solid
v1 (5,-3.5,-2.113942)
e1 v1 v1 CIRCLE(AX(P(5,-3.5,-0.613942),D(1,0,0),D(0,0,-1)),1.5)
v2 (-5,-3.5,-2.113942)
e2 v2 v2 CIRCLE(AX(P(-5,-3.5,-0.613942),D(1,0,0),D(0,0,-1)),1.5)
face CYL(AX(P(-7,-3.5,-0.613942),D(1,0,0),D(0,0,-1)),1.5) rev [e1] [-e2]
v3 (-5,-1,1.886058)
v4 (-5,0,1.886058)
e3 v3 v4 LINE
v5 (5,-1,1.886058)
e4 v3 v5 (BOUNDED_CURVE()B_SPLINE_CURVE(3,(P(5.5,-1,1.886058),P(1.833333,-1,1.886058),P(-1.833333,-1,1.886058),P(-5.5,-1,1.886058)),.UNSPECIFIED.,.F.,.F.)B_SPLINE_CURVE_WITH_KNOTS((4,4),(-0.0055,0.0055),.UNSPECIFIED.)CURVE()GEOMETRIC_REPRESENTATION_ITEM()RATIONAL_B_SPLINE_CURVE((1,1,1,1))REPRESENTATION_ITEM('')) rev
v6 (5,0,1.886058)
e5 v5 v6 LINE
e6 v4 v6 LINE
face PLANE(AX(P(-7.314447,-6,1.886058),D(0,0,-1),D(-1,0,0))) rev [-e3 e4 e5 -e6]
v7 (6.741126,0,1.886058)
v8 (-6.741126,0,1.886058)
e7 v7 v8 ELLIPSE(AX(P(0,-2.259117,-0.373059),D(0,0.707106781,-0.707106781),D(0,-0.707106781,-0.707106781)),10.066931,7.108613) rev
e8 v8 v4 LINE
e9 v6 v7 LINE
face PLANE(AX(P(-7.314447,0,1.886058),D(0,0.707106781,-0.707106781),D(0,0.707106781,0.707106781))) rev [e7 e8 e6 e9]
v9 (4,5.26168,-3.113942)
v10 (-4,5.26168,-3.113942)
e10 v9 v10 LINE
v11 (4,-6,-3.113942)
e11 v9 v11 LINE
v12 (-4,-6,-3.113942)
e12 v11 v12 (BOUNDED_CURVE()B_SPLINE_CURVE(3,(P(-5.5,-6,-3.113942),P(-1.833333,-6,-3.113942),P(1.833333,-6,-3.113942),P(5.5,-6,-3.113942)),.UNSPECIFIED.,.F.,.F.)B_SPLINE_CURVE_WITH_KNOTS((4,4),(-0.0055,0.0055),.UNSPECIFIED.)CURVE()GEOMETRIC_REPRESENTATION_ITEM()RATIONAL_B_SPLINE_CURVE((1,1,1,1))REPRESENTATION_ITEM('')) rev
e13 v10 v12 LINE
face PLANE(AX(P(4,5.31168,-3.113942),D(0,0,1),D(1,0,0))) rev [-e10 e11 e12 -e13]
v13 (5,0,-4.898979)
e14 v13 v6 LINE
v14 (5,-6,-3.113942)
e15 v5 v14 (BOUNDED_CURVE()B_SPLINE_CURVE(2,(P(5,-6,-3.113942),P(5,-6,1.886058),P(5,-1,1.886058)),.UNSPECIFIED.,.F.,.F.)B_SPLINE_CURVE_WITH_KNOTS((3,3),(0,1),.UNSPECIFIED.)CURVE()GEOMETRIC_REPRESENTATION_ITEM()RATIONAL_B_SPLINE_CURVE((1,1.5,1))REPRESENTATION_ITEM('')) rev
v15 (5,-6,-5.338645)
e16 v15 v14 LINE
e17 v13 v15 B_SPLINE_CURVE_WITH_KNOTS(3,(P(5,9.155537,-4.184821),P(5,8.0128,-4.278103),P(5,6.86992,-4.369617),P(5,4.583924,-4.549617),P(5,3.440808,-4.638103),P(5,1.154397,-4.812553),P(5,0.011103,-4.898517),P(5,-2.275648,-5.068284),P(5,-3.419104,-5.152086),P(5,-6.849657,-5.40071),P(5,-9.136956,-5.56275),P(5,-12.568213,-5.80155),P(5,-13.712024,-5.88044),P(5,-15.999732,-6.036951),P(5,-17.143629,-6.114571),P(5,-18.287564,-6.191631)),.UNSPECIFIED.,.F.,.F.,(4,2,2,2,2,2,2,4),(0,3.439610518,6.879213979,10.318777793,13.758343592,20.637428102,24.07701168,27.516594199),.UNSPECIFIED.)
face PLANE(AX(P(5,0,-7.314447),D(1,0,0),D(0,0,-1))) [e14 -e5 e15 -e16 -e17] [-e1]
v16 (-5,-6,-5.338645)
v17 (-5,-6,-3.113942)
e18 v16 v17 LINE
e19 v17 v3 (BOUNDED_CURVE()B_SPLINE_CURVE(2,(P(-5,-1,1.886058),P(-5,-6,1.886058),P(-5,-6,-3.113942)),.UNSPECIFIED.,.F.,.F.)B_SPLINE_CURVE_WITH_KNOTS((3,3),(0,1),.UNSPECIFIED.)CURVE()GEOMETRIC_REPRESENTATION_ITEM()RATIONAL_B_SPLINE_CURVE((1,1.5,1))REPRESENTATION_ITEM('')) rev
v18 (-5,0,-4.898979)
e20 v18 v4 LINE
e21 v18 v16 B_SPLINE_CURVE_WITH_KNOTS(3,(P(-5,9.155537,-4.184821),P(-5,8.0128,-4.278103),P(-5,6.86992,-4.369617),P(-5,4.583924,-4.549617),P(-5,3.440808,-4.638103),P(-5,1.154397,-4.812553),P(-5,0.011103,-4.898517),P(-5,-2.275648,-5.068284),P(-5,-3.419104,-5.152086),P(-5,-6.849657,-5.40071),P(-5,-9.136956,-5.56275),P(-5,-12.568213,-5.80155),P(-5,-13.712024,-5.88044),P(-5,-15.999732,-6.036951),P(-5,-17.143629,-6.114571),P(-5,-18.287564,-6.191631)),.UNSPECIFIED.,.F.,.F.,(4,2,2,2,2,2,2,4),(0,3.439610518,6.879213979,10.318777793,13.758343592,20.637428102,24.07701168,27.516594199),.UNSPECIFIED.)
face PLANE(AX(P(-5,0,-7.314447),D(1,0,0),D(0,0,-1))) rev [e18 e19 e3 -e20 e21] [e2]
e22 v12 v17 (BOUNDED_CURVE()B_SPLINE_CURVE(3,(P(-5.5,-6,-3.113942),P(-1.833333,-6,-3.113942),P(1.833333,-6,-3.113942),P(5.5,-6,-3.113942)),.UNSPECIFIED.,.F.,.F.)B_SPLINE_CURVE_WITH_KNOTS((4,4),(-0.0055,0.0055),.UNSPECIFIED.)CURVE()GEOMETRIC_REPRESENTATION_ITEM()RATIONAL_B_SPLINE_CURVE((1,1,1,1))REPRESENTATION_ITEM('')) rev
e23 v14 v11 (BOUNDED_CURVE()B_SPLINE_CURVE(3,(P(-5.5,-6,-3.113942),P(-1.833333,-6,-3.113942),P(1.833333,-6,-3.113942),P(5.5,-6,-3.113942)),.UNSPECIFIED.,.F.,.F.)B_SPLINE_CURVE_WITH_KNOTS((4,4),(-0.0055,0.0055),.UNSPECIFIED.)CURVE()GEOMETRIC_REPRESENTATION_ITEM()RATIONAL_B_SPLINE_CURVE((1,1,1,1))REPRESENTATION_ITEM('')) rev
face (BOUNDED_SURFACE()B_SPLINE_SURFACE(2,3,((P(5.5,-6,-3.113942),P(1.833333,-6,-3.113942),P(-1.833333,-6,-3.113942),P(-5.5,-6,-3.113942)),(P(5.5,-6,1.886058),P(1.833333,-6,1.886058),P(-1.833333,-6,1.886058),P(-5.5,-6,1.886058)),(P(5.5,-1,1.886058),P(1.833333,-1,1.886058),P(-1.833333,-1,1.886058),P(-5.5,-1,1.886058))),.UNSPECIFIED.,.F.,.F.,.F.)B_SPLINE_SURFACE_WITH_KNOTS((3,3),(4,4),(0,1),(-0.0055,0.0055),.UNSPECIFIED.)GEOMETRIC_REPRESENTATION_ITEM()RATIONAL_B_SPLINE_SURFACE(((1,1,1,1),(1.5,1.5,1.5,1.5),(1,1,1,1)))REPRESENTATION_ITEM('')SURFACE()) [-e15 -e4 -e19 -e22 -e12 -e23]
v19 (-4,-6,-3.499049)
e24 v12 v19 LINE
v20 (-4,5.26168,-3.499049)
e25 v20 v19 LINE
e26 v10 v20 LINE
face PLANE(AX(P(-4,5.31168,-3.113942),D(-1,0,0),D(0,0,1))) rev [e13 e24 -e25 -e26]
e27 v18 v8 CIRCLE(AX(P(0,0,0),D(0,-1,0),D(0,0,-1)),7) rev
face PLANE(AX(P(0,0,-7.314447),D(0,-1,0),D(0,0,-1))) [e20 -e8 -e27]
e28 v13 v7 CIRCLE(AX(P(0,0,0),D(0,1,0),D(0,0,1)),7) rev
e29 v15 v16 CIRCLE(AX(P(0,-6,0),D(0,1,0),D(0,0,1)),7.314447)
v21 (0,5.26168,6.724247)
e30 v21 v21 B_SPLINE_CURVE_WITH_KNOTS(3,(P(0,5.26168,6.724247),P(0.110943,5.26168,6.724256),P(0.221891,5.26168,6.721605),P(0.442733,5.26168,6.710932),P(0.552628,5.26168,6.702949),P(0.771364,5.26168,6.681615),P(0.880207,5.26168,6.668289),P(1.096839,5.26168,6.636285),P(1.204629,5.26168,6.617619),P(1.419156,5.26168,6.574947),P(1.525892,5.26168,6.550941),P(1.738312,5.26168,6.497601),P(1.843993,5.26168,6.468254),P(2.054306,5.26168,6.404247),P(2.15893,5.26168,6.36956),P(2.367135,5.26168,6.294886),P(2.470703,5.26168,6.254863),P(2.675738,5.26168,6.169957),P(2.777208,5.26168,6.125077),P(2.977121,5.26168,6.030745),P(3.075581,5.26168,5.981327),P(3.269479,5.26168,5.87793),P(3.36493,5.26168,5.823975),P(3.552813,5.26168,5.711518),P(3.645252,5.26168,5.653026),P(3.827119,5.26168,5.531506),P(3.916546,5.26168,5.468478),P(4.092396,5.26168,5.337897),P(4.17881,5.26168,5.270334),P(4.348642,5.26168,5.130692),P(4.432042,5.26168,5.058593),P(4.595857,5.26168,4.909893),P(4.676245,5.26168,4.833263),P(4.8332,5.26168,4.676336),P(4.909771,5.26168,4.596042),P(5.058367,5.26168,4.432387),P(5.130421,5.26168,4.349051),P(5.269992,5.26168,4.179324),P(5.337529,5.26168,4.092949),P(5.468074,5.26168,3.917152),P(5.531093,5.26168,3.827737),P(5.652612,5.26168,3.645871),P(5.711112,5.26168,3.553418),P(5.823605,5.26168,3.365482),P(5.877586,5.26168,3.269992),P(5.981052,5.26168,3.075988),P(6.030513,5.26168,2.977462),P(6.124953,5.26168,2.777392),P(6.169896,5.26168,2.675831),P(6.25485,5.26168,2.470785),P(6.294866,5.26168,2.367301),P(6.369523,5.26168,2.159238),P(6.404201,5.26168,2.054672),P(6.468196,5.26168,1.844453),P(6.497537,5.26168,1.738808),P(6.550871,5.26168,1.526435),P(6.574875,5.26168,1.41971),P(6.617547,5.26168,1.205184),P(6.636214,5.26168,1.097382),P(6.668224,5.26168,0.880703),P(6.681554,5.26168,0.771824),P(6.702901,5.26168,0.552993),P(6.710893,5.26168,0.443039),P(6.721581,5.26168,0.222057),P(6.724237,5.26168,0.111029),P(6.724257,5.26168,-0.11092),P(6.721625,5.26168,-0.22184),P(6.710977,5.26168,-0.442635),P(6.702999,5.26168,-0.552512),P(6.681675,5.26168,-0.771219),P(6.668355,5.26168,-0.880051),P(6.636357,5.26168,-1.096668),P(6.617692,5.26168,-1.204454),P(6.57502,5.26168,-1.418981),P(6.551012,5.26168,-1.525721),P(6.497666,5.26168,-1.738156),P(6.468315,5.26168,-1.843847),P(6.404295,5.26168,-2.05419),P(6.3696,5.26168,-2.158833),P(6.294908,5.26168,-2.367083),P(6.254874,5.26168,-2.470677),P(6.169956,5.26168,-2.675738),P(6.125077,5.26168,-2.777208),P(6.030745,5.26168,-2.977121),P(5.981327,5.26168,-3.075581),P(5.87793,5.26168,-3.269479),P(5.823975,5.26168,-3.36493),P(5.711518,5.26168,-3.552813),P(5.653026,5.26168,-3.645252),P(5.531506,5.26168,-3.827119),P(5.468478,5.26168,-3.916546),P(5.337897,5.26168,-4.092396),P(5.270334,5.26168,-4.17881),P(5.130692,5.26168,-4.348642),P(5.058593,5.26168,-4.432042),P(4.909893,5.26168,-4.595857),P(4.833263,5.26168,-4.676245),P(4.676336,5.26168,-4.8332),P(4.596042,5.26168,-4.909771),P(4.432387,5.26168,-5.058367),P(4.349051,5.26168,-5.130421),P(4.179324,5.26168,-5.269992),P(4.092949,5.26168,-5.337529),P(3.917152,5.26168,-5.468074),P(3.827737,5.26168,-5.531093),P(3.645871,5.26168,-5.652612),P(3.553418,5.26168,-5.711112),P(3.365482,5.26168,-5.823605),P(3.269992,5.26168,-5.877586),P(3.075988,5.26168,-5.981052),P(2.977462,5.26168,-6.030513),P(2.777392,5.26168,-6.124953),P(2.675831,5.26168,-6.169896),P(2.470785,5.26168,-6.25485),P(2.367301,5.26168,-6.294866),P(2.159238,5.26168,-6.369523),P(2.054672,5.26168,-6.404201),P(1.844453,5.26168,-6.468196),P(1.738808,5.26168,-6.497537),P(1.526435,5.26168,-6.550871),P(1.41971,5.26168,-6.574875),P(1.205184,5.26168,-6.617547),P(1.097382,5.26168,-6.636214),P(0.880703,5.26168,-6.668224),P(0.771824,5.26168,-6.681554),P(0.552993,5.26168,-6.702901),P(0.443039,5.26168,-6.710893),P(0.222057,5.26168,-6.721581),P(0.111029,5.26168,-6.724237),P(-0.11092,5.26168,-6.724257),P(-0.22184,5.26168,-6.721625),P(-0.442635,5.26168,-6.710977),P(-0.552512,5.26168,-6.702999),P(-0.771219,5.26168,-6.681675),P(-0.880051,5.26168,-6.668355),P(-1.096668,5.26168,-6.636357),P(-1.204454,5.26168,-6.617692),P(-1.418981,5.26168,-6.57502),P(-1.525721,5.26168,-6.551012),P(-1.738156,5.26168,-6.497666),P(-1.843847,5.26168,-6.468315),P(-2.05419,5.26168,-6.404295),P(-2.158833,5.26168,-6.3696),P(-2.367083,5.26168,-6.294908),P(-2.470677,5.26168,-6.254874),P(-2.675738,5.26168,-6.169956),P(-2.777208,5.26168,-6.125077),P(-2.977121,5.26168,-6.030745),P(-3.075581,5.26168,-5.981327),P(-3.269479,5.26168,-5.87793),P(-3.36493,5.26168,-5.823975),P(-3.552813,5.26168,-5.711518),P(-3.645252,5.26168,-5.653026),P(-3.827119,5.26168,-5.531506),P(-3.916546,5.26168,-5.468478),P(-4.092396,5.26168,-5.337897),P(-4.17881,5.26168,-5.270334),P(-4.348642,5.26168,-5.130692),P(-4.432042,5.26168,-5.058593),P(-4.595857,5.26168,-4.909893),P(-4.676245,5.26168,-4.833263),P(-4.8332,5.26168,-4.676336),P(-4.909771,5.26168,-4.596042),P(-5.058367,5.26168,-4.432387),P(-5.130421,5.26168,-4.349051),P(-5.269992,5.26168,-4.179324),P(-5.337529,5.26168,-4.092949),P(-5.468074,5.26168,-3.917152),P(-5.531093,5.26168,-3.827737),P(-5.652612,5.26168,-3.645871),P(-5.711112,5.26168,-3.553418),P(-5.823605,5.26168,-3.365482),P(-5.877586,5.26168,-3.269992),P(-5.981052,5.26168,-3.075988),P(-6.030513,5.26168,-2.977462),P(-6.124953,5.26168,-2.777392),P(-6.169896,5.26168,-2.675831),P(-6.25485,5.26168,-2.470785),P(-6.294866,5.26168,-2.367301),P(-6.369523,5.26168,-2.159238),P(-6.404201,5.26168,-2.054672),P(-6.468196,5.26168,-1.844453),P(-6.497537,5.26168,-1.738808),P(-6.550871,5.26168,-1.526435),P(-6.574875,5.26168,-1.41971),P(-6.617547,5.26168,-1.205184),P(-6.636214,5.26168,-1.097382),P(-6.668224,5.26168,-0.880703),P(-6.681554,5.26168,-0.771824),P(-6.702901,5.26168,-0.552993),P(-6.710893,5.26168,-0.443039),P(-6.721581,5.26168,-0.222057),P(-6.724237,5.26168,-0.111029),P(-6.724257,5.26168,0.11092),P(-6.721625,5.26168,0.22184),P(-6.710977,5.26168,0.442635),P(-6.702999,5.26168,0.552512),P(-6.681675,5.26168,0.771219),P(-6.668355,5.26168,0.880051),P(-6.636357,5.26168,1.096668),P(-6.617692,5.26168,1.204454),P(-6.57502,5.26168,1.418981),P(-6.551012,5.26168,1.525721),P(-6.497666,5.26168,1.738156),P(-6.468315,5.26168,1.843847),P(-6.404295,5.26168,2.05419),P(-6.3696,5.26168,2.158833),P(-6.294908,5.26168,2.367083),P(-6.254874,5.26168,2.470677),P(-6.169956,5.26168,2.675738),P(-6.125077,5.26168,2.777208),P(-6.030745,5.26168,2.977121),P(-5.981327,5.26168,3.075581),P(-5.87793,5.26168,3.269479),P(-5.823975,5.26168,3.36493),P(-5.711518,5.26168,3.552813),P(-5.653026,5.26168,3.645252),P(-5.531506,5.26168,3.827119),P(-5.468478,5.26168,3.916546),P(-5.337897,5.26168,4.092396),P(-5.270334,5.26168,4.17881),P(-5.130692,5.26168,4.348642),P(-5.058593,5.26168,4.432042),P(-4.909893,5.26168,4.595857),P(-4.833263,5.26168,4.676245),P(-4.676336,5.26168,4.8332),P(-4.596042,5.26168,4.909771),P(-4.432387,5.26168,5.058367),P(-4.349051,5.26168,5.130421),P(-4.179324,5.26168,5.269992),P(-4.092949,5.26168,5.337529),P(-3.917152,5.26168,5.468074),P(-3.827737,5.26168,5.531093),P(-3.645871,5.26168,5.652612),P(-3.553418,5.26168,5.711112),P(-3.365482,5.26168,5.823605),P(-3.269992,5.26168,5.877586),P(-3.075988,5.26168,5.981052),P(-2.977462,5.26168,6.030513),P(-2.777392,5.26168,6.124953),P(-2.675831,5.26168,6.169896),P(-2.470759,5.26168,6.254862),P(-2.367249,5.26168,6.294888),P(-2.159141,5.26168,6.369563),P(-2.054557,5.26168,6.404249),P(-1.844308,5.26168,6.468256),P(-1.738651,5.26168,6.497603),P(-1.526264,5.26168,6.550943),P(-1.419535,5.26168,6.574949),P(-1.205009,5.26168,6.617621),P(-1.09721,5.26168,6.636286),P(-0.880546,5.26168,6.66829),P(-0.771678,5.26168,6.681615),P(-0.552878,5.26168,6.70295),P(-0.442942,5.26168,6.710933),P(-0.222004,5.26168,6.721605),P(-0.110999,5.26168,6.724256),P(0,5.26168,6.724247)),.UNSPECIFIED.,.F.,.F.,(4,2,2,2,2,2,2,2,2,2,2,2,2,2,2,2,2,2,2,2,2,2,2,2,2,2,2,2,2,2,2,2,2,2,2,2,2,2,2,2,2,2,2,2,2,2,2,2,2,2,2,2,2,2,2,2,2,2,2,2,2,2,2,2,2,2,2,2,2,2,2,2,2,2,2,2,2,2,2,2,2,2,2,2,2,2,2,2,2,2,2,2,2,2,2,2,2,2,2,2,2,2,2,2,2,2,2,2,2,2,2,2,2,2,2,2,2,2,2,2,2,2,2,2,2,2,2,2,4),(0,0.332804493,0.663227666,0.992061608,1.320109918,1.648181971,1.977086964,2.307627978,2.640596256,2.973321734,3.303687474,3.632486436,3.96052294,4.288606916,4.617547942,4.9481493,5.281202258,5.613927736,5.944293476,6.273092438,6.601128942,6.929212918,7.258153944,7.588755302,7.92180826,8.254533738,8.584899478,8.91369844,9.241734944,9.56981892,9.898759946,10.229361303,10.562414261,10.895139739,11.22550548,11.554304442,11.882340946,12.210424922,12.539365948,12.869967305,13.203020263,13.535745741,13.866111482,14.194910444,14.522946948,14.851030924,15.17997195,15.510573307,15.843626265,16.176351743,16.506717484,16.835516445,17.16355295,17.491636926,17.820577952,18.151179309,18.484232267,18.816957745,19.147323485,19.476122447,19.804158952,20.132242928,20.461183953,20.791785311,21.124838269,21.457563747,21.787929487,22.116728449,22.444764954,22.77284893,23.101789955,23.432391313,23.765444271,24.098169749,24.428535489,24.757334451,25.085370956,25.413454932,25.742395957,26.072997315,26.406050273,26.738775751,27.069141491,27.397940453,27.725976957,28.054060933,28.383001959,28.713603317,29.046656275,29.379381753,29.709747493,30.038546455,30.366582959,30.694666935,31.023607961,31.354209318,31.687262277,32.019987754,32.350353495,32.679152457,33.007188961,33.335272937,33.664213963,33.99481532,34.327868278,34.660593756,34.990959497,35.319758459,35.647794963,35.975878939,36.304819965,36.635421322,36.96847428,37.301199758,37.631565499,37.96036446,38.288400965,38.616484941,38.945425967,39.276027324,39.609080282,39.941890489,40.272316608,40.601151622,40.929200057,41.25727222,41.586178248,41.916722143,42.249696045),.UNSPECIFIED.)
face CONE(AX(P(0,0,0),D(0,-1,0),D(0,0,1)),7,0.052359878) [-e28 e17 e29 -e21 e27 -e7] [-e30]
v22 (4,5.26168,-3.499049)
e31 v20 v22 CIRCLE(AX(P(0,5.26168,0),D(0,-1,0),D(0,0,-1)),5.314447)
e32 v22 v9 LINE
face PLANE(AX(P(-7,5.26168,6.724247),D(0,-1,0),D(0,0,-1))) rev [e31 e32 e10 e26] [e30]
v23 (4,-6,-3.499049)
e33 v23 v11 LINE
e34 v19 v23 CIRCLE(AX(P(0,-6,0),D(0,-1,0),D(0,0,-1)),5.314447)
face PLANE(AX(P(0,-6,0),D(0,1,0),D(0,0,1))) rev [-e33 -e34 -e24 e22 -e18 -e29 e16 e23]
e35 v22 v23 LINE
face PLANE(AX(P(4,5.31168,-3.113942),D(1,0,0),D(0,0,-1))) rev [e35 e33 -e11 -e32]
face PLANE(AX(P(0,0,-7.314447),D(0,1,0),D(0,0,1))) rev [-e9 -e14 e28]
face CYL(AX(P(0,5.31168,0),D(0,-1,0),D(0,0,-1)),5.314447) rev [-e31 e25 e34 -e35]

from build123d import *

# Parameters (mm, degrees)
SKETCH1_R                     = 7
BOSS_EXTRUDE1_DEPTH           = 15
BOSS_EXTRUDE1_TAPER           = 3
BOSS_EXTRUDE1_OTHER_WAY_DEPTH = 6
BOSS_EXTRUDE1_OTHER_WAY_TAPER = -3
CUT_EXTRUDE1_DEPTH            = 19.220929184
CUT_EXTRUDE1_DEPTH_BACK       = 19.220929184
CUT_EXTRUDE2_START            = -9.200504543
CUT_EXTRUDE2_OUTLINE_W        = 6.502745185
CUT_EXTRUDE2_OUTLINE_H        = 6
CUT_EXTRUDE2_DEPTH            = 9.200504543
SKETCH5_R                     = 1.5
CUT_EXTRUDE3_DEPTH            = 21.554832283
FILLET1_SIZE                  = 5
CUT_EXTRUDE4_DEPTH            = 19.096992379
CUT_EXTRUDE4_DEPTH_BACK       = 19.096992379
SKETCH6_W                     = 14.909790155
SKETCH6_H                     = 10.479187812
CUT_EXTRUDE5_DEPTH            = 16.143532008


with BuildPart() as part:
    # Sketch1 → Boss-Extrude1 (new body)
    with BuildSketch(Plane(origin=(0, 0, 0), x_dir=(1, 0, 0), z_dir=(0, 1, 0))):
        Circle(SKETCH1_R)
    extrude(amount=BOSS_EXTRUDE1_DEPTH, taper=BOSS_EXTRUDE1_TAPER)

    # Sketch1 → Boss-Extrude1 other way (add)
    with BuildSketch(Plane(origin=(0, 0, 0), x_dir=(1, 0, 0), z_dir=(0, 1, 0))):
        Circle(SKETCH1_R)
    extrude(amount=-BOSS_EXTRUDE1_OTHER_WAY_DEPTH, taper=BOSS_EXTRUDE1_OTHER_WAY_TAPER)

    # Sketch3 → Cut-Extrude1 (cut, two sides: drawn at the far end of the back side and taken through both)
    with BuildSketch(Plane(origin=(0, 0, 0), x_dir=(0, 0, -1), z_dir=(1, 0, 0)).offset(-CUT_EXTRUDE1_DEPTH_BACK)):
        Polygon((-1.886057768, -6), (-1.886057768, 0), (-9.929766736, 8.043708969), (-9.929766736, -6), align=None)
    extrude(amount=CUT_EXTRUDE1_DEPTH + CUT_EXTRUDE1_DEPTH_BACK, mode=Mode.SUBTRACT)

    # Cut-Extrude2: read off the stored shape, not the designer's step
    # Cut-Extrude2 outline → Cut-Extrude2 (cut)
    with BuildSketch(Plane.XY.offset(1.886057768).offset(CUT_EXTRUDE2_START)):
        with Locations((-8.251372593, -3)):
            Rectangle(CUT_EXTRUDE2_OUTLINE_W, CUT_EXTRUDE2_OUTLINE_H)
        with Locations((8.251372593, -3)):
            Rectangle(CUT_EXTRUDE2_OUTLINE_W, CUT_EXTRUDE2_OUTLINE_H)
    extrude(amount=CUT_EXTRUDE2_DEPTH, mode=Mode.SUBTRACT)

    # Sketch5 → Cut-Extrude3 (cut, through all)
    with BuildSketch(Plane(origin=(5, 0, 0), x_dir=(0, 0, -1), z_dir=(1, 0, 0))):
        with Locations((0.613942232, -3.5)):
            Circle(SKETCH5_R)
    extrude(amount=-CUT_EXTRUDE3_DEPTH, mode=Mode.SUBTRACT)

    # Fillet1
    # a fillet whose section is not a circle: 5 mm, written as the material it takes off along each edge
    with BuildSketch(Plane(origin=(17.5, -6, 1.886057768), x_dir=(0, 0, -1), z_dir=(-1, 0, 0))) as fillet1_piece_1:
        with BuildLine():
            Bezier((FILLET1_SIZE, 0), (0, 0), (0, -FILLET1_SIZE), weights=[1, 1.5, 1])
            Line((0, -FILLET1_SIZE), (0, 0))
            Line((0, 0), (FILLET1_SIZE, 0))
        make_face()
    extrude(amount=35, mode=Mode.SUBTRACT)

    # Fillet2
    # a fillet whose section is not a circle: 10, 5 mm, written as the material it takes off along each edge
    with BuildSketch(Plane(origin=(0, 15, 0), x_dir=(1, 0, 0), z_dir=(0, 0, -1))) as fillet2_piece_1:
        with BuildLine():
            Bezier((6.724247047, 9.738320219), (6.213883311, 0), (1.731099374, 0), weights=[1, 0.818181818, 1])
            Line((1.731099374, 0), (6.213883311, 0))
            Line((6.213883311, 0), (6.724247047, 9.738320219))
        make_face()
    revolve(axis=Axis((0, 15, 0), (0, -1, 0)), mode=Mode.SUBTRACT)

    # Sketch6 → Cut-Extrude4 (cut, two sides: drawn at the far end of the back side and taken through both)
    with BuildSketch(Plane(origin=(0, 0, 0), x_dir=(0, 0, -1), z_dir=(1, 0, 0)).offset(-CUT_EXTRUDE4_DEPTH_BACK)):
        with Locations((0.730648031, 10.501273687)):
            Rectangle(SKETCH6_W, SKETCH6_H)
    extrude(amount=CUT_EXTRUDE4_DEPTH + CUT_EXTRUDE4_DEPTH_BACK, mode=Mode.SUBTRACT)

    # Sketch7 → Cut-Extrude5 (cut, through all)
    with BuildSketch(Plane.XZ.offset(6)):
        with BuildLine():
            Line((4, -3.113942232), (4, -3.499048938))
            ThreePointArc((4, -3.499048938), (0, -5.314446676), (-4, -3.499048938))
            Line((-4, -3.499048938), (-4, -3.113942232))
            Line((-4, -3.113942232), (4, -3.113942232))
        make_face()
    extrude(amount=-CUT_EXTRUDE5_DEPTH, mode=Mode.SUBTRACT)


solid = part.part
